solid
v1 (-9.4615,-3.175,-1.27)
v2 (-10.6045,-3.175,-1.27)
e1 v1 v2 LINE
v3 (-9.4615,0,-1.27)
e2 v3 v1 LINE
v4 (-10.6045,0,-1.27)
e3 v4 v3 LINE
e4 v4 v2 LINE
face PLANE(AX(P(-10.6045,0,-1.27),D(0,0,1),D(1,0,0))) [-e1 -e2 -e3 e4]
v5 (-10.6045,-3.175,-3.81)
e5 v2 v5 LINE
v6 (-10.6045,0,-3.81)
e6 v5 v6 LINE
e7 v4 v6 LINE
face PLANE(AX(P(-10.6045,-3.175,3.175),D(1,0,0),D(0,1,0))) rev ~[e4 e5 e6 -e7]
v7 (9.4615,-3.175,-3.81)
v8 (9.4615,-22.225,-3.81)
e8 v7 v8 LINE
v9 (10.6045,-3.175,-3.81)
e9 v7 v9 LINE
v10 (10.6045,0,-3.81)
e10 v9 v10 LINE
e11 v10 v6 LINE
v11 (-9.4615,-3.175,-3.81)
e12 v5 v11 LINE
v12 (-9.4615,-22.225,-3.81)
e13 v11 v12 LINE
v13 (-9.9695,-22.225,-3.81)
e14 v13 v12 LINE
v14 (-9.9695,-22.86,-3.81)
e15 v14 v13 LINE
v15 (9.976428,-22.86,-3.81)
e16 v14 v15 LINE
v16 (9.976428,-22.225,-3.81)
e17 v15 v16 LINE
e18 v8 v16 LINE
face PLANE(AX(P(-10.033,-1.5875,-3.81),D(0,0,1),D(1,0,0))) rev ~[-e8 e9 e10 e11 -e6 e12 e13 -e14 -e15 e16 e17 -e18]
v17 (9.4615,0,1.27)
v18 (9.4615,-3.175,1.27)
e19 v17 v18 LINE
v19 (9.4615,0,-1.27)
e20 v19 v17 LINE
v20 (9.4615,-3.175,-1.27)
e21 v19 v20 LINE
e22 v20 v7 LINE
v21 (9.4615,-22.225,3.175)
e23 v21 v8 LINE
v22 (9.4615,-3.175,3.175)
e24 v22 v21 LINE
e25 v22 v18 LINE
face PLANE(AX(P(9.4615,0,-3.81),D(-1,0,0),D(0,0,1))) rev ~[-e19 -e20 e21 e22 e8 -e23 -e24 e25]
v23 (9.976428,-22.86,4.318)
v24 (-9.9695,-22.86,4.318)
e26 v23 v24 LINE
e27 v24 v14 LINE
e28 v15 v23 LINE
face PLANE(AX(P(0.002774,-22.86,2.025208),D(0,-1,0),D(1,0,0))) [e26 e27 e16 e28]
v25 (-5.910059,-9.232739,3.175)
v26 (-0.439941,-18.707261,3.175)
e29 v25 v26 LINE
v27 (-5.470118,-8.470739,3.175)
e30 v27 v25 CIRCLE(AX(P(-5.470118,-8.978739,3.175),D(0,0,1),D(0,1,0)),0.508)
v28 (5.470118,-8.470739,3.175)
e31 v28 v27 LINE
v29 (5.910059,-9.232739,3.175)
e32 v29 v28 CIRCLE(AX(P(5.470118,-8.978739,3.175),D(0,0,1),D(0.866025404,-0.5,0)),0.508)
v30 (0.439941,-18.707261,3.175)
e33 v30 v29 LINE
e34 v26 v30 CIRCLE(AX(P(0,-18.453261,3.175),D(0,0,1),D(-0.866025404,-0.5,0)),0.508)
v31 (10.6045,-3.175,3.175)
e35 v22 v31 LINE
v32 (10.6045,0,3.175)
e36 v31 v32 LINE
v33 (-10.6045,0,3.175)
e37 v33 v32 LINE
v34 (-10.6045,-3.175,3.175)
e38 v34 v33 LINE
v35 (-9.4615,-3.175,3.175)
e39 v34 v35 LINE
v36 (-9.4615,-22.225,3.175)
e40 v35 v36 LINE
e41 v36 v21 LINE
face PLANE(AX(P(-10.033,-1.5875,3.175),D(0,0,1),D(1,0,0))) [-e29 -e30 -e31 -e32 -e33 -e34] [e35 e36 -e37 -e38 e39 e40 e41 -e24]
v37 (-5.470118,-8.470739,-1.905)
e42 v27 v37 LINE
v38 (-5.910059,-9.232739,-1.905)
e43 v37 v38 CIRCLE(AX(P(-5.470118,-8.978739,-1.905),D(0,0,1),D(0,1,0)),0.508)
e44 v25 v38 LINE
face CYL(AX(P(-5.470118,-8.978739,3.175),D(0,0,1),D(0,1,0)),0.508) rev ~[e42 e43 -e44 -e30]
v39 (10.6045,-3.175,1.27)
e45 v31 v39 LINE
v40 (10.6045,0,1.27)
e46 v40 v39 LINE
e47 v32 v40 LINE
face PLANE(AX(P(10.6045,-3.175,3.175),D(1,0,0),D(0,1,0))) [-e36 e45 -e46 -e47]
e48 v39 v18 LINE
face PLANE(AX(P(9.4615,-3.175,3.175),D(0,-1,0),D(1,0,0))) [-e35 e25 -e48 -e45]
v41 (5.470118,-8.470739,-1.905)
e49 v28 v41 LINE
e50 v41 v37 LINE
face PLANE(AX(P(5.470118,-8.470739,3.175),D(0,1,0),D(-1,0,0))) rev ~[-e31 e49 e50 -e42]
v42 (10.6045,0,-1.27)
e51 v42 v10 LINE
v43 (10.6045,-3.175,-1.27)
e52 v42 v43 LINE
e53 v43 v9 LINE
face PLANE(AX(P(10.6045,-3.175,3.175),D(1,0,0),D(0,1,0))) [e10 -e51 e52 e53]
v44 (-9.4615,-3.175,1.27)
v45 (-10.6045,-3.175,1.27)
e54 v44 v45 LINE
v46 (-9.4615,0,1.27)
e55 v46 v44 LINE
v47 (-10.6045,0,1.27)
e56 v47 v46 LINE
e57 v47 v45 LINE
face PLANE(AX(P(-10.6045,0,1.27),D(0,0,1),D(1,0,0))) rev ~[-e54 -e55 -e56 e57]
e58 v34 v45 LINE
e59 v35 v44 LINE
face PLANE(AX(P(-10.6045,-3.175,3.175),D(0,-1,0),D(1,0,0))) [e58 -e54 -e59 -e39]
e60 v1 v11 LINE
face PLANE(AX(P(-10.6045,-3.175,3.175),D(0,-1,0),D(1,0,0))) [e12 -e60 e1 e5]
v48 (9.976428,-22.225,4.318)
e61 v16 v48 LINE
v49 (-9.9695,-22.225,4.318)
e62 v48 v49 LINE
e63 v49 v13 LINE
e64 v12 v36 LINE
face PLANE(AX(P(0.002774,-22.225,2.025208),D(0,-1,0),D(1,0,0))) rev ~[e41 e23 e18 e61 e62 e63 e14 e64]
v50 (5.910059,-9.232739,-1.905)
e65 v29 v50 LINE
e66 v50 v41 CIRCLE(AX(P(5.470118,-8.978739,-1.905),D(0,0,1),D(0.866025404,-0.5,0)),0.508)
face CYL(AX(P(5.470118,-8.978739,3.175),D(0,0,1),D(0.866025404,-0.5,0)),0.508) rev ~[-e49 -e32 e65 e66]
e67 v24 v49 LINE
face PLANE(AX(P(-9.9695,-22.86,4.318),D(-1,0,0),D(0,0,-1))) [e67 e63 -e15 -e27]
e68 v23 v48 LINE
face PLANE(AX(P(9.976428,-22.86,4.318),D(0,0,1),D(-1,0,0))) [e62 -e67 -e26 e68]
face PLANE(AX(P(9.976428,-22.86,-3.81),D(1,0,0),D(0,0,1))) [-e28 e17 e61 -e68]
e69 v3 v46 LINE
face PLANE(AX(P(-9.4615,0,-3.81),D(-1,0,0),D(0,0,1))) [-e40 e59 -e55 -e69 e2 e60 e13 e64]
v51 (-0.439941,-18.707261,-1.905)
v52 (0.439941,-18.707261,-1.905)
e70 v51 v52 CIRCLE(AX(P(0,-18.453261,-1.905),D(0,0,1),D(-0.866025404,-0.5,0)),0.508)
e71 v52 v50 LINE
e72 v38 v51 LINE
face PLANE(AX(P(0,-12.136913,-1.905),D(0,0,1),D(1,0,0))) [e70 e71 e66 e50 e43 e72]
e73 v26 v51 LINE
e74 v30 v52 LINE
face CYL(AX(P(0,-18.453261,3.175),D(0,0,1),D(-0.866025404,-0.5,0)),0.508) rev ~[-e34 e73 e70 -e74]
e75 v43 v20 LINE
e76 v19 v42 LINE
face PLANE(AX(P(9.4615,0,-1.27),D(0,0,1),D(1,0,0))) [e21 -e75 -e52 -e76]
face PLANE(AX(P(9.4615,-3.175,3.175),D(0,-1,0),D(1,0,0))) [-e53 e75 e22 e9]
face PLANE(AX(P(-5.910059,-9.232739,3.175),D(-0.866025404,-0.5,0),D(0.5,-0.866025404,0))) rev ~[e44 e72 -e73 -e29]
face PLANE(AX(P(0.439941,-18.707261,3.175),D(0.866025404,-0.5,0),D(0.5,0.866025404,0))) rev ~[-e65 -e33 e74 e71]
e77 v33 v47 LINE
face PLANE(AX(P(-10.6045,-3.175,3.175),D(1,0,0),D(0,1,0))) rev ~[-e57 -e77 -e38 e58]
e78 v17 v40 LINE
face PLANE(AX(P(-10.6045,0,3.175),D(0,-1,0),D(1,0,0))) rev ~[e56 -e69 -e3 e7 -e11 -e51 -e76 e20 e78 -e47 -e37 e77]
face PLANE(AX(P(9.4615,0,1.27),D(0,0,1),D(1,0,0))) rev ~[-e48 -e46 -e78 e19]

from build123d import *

# Parameters (mm, degrees)
F0_W     = 18.923
F0_H     = 6.985
F1_DEPTH = 22.86
F3_DEPTH = 0.635
F5_DEPTH = 5.08
F4_W     = 1.143
F4_H     = 3.175
F6_DEPTH = 6.985
F7_W     = 1.143
F7_H     = 2.54
F8_DEPTH = 12.7


# Not quite as in the source:
# - a feature names something its author has since deleted; it is built from what else it names


with BuildPart() as f1:
    # F0 (on Front) → F1 (new body)
    with BuildSketch(Plane.XZ):
        with Locations((0, -0.3175)):
            Rectangle(F0_W, F0_H)
    extrude(amount=F1_DEPTH)

    # F2 (on face) → F3 (join)
    with BuildSketch(Plane.XZ.offset(22.86)):
        Polygon((9.9764279214, 4.318), (-9.9695, 4.318), (-9.9695, -3.81), (-9.4615, -3.81), (-9.4615, 3.175), (9.4615, 3.175), (9.4615, -3.81), (9.9764279214, -3.81), align=None)
    extrude(amount=-F3_DEPTH)

    # F4 (on face) → F5 (cut)
    with BuildSketch(Plane.XY.offset(3.175)):
        with BuildLine():
            ThreePointArc((5.9100590949, -9.232738686), (5.9100590949, -8.724738686), (5.4701181898, -8.470738686))
            Line((5.4701181898, -8.470738686), (-5.4701181898, -8.470738686))
            ThreePointArc((-5.4701181898, -8.470738686), (-5.9100590949, -8.724738686), (-5.9100590949, -9.232738686))
            Line((-5.9100590949, -9.232738686), (-0.4399409051, -18.707261314))
            ThreePointArc((-0.4399409051, -18.707261314), (0, -18.961261314), (0.4399409051, -18.707261314))
            Line((0.4399409051, -18.707261314), (5.9100590949, -9.232738686))
        make_face()
    extrude(amount=-F5_DEPTH, mode=Mode.SUBTRACT)

    # F4 (on face) → F6 (join, through all)
    with BuildSketch(Plane.XY.offset(3.175)):
        with Locations((-10.033, -1.5875)):
            Rectangle(F4_W, F4_H)
        with Locations((10.033, -1.5875)):
            Rectangle(F4_W, F4_H)
    extrude(amount=-F6_DEPTH)

    # F7 (on face) → F8 (cut)
    with BuildSketch(Plane.XZ):
        with Locations((10.033, 0)):
            Rectangle(F7_W, F7_H)
        with Locations((-10.033, 0)):
            Rectangle(F7_W, F7_H)
    extrude(amount=F8_DEPTH, mode=Mode.SUBTRACT)


solid = f1.part
